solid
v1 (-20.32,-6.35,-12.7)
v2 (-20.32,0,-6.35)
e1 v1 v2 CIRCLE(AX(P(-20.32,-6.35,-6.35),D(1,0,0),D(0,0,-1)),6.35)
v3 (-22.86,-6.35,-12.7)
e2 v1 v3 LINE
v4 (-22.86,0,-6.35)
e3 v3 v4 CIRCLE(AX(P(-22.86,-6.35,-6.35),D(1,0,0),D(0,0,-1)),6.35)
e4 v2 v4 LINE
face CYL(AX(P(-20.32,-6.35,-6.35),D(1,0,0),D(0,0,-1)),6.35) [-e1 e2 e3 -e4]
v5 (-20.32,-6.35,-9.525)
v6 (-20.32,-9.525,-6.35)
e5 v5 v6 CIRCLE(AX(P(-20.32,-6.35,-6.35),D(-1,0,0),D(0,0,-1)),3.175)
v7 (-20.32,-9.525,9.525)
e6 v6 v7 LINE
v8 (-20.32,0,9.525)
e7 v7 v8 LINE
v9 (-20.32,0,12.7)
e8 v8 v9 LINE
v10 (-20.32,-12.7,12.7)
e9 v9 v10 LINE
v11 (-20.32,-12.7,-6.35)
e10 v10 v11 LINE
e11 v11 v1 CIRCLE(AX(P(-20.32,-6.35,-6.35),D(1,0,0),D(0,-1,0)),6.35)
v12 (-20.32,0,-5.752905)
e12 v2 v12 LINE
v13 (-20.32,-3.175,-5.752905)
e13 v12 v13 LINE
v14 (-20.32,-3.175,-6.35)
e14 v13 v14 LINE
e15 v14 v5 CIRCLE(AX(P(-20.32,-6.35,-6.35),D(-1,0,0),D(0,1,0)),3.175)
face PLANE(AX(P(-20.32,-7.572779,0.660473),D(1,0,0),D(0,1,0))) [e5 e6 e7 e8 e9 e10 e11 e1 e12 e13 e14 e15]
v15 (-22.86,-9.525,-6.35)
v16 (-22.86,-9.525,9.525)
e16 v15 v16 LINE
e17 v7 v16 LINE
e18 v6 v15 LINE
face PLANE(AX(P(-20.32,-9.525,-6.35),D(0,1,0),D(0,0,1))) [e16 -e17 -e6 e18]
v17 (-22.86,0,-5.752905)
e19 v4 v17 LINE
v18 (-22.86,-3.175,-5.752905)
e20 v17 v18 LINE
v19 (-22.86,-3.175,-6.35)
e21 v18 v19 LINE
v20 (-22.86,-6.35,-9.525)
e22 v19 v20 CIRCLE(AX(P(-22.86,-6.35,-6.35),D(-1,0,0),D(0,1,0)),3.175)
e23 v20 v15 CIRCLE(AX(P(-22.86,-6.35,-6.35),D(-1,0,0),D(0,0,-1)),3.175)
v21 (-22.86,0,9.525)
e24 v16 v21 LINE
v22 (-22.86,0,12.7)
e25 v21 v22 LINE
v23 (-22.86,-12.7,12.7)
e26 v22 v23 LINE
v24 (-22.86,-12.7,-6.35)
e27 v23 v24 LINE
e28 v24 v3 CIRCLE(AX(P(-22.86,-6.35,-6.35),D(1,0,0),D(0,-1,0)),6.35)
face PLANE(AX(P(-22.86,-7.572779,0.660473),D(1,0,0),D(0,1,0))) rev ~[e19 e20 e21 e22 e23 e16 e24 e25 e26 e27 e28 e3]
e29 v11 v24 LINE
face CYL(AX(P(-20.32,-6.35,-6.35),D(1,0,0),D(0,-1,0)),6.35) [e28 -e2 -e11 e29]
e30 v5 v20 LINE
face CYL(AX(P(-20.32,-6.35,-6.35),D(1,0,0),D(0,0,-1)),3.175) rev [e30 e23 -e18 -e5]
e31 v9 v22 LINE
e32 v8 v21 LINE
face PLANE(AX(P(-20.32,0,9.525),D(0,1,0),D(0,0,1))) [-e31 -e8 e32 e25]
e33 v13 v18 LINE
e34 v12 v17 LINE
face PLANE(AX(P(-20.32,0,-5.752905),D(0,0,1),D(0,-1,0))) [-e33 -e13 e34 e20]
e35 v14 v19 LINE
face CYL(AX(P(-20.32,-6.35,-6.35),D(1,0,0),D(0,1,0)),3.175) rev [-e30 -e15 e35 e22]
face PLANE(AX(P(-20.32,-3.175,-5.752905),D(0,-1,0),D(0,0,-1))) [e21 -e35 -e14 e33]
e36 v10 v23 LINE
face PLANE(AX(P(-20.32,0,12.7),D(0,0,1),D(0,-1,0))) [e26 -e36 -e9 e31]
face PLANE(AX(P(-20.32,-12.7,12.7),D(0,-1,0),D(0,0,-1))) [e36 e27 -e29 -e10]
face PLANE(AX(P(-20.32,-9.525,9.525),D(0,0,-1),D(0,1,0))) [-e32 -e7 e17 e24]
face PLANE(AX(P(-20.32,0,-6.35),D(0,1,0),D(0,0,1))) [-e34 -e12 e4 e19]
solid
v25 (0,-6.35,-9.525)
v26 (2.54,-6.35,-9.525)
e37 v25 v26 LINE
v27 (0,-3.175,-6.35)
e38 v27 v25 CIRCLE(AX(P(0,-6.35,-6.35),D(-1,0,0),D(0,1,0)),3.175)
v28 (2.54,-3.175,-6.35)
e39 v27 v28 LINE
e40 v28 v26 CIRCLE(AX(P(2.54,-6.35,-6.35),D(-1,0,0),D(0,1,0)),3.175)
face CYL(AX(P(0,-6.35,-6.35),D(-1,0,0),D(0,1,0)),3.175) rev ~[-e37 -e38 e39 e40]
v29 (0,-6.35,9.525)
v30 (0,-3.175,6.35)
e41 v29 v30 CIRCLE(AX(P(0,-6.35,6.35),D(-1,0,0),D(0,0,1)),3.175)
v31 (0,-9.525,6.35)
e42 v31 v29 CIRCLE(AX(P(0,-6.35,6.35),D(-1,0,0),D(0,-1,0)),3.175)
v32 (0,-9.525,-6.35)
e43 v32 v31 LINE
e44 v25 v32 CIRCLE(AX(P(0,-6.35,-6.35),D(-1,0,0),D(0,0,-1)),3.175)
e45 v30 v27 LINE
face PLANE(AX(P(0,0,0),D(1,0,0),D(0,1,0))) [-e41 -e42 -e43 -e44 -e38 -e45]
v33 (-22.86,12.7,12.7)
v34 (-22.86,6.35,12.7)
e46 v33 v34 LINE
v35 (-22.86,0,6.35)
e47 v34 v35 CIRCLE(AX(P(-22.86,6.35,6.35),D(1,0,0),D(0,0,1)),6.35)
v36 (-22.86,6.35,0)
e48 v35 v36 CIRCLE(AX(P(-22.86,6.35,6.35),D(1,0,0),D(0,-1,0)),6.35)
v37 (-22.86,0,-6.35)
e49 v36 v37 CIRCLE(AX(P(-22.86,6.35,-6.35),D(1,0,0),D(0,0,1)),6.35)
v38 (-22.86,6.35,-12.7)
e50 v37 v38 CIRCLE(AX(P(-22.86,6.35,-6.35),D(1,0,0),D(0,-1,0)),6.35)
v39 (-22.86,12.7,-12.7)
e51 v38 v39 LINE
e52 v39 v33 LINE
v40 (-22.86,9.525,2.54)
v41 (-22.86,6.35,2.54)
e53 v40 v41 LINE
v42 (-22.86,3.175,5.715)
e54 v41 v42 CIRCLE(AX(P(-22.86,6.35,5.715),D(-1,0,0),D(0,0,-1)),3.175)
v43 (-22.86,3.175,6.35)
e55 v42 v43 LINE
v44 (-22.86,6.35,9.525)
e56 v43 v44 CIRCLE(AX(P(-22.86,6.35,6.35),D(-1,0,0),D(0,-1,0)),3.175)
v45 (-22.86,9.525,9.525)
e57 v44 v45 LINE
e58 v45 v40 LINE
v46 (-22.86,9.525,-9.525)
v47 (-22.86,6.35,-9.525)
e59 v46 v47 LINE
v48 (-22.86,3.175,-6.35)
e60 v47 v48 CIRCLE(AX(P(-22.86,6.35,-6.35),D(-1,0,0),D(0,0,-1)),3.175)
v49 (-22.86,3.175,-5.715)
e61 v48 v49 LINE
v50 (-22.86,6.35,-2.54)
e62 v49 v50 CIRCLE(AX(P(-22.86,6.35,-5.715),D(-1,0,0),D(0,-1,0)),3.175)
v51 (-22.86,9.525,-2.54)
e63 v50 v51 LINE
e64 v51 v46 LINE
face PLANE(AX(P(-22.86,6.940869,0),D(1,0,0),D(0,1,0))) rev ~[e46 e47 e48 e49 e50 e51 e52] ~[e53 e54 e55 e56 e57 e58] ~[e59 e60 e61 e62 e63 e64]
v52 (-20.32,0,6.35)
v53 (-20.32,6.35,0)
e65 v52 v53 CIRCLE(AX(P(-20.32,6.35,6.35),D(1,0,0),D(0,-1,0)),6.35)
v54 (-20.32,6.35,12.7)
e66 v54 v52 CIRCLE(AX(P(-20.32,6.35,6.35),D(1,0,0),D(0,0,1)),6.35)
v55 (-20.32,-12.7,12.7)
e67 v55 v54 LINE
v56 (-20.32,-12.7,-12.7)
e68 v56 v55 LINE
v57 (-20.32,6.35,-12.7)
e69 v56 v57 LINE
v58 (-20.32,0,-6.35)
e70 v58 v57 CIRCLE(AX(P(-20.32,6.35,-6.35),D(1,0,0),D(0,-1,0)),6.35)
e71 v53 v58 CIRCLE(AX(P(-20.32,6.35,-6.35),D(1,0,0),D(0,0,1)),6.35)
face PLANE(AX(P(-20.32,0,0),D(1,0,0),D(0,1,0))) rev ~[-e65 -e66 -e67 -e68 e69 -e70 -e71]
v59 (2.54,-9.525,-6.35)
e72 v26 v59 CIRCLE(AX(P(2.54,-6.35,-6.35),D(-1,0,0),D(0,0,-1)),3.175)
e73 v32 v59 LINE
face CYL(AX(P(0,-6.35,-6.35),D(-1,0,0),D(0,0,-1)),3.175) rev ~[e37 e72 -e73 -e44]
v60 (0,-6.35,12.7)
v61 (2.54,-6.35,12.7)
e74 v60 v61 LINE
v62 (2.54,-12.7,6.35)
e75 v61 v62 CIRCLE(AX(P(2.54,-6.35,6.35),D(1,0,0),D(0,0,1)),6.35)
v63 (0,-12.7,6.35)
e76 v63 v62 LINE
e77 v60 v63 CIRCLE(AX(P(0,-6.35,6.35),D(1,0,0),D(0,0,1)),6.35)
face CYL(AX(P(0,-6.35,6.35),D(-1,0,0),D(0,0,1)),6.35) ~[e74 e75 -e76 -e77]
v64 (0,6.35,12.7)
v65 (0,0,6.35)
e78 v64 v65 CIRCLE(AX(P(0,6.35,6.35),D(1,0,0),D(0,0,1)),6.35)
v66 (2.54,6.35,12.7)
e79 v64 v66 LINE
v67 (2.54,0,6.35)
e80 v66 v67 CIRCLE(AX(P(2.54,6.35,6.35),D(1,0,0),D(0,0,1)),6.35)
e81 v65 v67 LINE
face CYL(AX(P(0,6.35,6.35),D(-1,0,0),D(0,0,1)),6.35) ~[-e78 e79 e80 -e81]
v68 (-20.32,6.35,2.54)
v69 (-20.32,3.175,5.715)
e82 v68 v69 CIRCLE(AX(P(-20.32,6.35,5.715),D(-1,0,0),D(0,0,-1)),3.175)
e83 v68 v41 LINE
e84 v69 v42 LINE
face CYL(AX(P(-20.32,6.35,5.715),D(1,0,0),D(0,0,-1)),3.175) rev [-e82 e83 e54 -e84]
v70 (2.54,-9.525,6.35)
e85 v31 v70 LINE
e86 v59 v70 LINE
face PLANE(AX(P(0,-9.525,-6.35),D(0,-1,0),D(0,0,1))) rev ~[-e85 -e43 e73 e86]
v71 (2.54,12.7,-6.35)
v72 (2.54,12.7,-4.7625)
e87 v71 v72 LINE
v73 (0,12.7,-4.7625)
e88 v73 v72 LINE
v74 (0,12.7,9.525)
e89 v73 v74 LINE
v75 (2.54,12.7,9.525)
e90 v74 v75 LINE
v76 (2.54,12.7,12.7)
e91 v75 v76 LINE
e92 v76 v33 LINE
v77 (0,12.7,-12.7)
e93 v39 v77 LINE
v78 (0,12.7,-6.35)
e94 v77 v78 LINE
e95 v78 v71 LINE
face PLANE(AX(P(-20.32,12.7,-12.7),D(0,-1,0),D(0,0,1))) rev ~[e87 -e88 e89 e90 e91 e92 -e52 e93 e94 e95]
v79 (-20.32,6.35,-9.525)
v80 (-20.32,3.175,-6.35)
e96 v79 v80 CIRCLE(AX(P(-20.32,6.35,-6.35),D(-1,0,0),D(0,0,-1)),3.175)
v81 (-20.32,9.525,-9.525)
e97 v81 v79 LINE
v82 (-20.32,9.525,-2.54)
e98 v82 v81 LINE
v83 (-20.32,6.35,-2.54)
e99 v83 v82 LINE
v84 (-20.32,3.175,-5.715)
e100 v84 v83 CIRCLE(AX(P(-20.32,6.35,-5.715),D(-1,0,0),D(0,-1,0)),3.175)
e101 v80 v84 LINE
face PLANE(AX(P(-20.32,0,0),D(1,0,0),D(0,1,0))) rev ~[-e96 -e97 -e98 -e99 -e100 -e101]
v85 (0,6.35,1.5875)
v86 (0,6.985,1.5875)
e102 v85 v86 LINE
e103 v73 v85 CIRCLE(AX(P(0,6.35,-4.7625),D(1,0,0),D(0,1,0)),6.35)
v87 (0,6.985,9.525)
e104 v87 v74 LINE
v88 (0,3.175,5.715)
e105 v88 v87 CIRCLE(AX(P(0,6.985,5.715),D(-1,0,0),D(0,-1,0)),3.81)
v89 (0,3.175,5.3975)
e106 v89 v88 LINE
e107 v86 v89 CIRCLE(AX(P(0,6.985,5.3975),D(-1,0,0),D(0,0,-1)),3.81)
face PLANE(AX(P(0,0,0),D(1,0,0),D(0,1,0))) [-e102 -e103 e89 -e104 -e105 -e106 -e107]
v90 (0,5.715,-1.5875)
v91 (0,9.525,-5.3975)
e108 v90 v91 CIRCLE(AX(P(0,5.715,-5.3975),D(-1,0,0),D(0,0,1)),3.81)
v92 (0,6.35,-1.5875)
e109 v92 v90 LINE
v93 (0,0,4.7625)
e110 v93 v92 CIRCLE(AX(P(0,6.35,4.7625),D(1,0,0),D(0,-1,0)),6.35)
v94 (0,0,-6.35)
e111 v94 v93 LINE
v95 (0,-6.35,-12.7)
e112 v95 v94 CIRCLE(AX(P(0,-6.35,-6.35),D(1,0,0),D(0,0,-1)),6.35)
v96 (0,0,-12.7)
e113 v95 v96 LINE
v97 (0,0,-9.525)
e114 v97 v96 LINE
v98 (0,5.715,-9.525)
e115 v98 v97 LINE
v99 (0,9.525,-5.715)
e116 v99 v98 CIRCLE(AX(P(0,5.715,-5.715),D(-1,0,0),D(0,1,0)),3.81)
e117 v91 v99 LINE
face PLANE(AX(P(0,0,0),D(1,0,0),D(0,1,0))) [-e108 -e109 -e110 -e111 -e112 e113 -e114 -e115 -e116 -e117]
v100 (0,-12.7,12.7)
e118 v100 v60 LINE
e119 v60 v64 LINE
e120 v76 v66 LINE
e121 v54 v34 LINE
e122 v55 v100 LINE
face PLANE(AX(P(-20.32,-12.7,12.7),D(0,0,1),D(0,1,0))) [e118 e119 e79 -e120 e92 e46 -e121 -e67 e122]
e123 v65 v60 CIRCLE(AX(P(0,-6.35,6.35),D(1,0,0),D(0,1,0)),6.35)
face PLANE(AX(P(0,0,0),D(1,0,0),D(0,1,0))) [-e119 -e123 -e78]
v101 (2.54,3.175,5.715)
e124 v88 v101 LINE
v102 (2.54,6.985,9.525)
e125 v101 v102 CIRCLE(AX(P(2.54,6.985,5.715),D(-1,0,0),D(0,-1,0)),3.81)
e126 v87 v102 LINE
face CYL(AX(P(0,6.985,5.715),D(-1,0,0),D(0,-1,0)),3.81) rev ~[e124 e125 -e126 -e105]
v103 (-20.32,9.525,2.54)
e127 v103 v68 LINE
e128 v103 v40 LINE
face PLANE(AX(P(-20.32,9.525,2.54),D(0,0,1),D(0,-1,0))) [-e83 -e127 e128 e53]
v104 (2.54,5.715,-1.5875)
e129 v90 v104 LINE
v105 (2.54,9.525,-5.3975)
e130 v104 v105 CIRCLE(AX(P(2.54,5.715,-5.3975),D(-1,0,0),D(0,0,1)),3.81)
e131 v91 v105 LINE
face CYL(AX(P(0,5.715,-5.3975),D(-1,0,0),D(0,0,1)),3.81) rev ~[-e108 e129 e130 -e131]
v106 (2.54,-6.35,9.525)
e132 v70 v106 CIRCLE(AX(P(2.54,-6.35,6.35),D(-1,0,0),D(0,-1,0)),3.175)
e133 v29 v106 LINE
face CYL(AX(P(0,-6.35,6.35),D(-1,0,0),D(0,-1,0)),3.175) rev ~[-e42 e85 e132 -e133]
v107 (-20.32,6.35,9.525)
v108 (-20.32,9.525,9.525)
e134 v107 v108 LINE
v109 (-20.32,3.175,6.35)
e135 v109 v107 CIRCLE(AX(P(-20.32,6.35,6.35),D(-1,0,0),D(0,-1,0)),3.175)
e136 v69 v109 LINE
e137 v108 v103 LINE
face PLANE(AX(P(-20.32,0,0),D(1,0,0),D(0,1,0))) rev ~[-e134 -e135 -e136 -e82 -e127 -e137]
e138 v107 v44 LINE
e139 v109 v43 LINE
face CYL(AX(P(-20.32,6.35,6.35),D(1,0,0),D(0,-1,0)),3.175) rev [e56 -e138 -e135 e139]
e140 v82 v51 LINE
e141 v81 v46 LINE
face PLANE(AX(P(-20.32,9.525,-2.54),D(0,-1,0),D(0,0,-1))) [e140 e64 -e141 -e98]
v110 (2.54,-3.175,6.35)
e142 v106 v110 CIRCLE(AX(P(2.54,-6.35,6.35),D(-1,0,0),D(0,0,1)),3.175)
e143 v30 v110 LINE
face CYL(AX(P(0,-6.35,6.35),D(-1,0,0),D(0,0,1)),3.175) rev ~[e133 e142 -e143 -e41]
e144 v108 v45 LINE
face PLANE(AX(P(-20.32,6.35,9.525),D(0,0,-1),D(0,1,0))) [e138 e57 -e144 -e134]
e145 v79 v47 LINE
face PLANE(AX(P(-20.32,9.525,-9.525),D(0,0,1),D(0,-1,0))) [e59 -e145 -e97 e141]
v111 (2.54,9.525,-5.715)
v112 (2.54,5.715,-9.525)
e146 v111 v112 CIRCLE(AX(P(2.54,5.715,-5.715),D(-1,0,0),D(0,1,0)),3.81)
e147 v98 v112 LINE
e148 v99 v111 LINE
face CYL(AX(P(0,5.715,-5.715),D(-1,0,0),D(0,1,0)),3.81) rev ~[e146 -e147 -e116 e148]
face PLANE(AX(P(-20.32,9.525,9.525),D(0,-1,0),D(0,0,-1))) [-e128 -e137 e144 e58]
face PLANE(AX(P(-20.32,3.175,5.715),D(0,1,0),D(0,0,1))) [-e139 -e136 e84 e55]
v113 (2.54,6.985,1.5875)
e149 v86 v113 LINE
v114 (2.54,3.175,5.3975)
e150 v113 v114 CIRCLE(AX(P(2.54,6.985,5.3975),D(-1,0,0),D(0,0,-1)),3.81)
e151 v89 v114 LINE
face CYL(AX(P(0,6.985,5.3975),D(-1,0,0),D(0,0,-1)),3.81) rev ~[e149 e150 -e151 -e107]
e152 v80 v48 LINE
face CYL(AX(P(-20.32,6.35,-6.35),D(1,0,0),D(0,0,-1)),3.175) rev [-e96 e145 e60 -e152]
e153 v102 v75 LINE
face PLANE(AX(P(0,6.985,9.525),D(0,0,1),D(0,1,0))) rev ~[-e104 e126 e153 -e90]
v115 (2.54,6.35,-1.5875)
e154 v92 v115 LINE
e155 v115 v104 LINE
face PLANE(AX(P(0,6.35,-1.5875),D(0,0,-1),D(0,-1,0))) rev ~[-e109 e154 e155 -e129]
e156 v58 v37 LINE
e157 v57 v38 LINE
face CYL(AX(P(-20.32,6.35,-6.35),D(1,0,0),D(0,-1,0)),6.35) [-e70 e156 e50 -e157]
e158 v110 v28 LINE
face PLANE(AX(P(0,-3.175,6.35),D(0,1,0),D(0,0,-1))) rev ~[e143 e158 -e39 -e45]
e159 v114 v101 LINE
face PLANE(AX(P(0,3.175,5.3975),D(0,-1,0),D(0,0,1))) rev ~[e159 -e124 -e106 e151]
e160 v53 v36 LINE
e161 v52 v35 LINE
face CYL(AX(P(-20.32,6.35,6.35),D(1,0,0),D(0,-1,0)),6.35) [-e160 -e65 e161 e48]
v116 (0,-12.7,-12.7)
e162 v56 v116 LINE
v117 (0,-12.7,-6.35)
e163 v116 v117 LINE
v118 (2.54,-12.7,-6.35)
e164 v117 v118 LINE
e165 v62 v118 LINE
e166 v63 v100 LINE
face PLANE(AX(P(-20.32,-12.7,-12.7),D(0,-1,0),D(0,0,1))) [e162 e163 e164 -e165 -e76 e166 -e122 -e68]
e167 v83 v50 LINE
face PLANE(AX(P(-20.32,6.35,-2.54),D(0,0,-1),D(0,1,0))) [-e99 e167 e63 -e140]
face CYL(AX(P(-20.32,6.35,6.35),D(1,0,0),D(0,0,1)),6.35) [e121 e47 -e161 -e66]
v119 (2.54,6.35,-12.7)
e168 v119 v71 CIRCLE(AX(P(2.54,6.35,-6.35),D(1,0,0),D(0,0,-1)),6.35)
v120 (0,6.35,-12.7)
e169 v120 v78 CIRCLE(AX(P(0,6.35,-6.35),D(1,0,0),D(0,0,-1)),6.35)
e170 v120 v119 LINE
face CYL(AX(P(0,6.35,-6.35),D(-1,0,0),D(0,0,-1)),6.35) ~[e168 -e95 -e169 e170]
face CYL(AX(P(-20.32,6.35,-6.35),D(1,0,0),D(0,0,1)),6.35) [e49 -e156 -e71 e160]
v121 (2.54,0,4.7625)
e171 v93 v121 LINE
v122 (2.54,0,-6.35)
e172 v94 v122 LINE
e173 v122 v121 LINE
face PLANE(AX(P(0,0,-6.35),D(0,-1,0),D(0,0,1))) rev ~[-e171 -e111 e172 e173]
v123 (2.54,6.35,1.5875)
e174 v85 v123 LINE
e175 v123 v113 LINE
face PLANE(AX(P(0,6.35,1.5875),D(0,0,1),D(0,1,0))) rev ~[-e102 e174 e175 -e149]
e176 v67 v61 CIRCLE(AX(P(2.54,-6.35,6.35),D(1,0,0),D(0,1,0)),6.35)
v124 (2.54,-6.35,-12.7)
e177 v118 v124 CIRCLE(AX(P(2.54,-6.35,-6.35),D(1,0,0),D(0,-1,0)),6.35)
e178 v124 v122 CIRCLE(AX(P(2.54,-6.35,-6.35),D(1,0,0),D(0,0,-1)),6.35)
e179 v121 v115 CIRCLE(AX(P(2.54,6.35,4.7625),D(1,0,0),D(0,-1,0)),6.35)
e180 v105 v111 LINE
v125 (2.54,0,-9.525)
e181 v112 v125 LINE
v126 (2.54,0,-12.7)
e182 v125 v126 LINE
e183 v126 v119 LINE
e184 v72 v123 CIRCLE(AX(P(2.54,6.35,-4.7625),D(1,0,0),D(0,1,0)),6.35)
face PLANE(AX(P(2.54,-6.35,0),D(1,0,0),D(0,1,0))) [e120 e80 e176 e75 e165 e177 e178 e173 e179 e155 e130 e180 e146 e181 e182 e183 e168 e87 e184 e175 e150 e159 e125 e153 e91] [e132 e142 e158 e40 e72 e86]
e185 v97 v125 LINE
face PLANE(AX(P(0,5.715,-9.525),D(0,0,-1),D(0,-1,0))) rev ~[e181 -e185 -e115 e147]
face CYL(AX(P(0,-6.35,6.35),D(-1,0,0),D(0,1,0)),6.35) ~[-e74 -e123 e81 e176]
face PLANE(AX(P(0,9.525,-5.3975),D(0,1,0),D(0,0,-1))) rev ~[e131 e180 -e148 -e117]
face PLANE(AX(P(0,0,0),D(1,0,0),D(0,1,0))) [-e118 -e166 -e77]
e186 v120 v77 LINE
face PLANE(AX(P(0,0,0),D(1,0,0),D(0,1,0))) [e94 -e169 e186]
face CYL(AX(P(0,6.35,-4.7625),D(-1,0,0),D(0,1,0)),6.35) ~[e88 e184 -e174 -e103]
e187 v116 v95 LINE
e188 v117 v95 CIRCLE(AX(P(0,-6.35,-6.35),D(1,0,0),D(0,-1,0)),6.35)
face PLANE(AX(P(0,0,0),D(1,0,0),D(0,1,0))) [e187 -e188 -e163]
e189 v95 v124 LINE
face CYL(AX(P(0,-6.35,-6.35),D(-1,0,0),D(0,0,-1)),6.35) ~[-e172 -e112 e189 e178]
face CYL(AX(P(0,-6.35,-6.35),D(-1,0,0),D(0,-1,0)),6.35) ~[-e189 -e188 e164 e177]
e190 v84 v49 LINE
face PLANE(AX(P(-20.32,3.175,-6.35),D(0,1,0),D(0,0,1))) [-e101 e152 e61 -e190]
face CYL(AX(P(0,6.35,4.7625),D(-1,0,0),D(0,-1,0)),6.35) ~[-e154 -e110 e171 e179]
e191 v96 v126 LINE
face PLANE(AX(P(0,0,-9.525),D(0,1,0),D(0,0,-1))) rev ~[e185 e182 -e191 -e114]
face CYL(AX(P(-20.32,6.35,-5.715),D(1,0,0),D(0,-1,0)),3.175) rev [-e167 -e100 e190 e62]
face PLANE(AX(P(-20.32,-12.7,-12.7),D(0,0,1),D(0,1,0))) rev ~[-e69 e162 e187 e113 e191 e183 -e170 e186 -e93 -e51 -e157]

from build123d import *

# Parameters (mm, degrees)
F3_DEPTH = 2.54
F4_DEPTH = 2.54
F5_W     = 25.4
F5_H     = 25.4
F6_DEPTH = 20.32


with BuildPart() as f3:
    # F0 (on Right) → F3 (new body)
    with BuildSketch(Plane.YZ):
        with BuildLine():
            Line((0, 4.7625), (0, 6.35))
            ThreePointArc((0, 6.35), (-1.8598719395, 10.8401280605), (-6.35, 12.7))
            ThreePointArc((-6.35, 12.7), (-10.8401280605, 10.8401280605), (-12.7, 6.35))
            Line((-12.7, 6.35), (-12.7, -6.35))
            ThreePointArc((-12.7, -6.35), (-10.8401280605, -10.8401280605), (-6.35, -12.7))
            ThreePointArc((-6.35, -12.7), (-1.8598719395, -10.8401280605), (0, -6.35))
            Line((0, -6.35), (0, -3.81))
            Line((0, -3.81), (0, 4.7625))
        make_face()
        with BuildLine():
            ThreePointArc((-6.35, 9.525), (-4.1049359697, 8.5950640303), (-3.175, 6.35))
            Line((-3.175, 6.35), (-3.175, -6.35))
            ThreePointArc((-3.175, -6.35), (-4.1049359697, -8.5950640303), (-6.35, -9.525))
            ThreePointArc((-6.35, -9.525), (-8.5950640303, -8.5950640303), (-9.525, -6.35))
            Line((-9.525, -6.35), (-9.525, 6.35))
            ThreePointArc((-9.525, 6.35), (-8.5950640303, 8.5950640303), (-6.35, 9.525))
        make_face(mode=Mode.SUBTRACT)
        with BuildLine():
            Line((12.7, 12.7), (11.43, 12.7))
            Line((11.43, 12.7), (6.35, 12.7))
            ThreePointArc((6.35, 12.7), (1.8598719395, 10.8401280605), (0, 6.35))
            Line((0, 6.35), (0, 4.7625))
            ThreePointArc((0, 4.7625), (1.8598719395, 0.2723719395), (6.35, -1.5875))
            Line((6.35, -1.5875), (5.715, -1.5875))
            ThreePointArc((5.715, -1.5875), (8.4090768363, -2.7034231637), (9.525, -5.3975))
            Line((9.525, -5.3975), (9.525, -5.715))
            ThreePointArc((9.525, -5.715), (8.4090768363, -8.4090768363), (5.715, -9.525))
            Line((5.715, -9.525), (1.27, -9.525))
            Line((1.27, -9.525), (0, -9.525))
            Line((0, -9.525), (0, -12.7))
            Line((0, -12.7), (1.27, -12.7))
            Line((1.27, -12.7), (6.35, -12.7))
            ThreePointArc((6.35, -12.7), (10.8401280605, -10.8401280605), (12.7, -6.35))
            Line((12.7, -6.35), (12.7, -4.7625))
            ThreePointArc((12.7, -4.7625), (10.8401280605, -0.2723719395), (6.35, 1.5875))
            Line((6.35, 1.5875), (6.985, 1.5875))
            ThreePointArc((6.985, 1.5875), (4.2909231637, 2.7034231637), (3.175, 5.3975))
            Line((3.175, 5.3975), (3.175, 5.715))
            ThreePointArc((3.175, 5.715), (4.2909231637, 8.4090768363), (6.985, 9.525))
            Line((6.985, 9.525), (11.43, 9.525))
            Line((11.43, 9.525), (12.7, 9.525))
            Line((12.7, 9.525), (12.7, 12.7))
        make_face()
    extrude(amount=F3_DEPTH)



with BuildPart() as f4:
    # F2 (on offset) → F4 (new body)
    with BuildSketch(Plane.YZ.offset(-20.32)):
        with BuildLine():
            Line((12.7, -12.7), (12.7, 12.7))
            Line((12.7, 12.7), (6.35, 12.7))
            ThreePointArc((6.35, 12.7), (1.8598719395, 10.8401280605), (0, 6.35))
            ThreePointArc((0, 6.35), (1.8598719395, 1.8598719395), (6.35, 0))
            ThreePointArc((6.35, 0), (1.8598719395, -1.8598719395), (0, -6.35))
            ThreePointArc((0, -6.35), (1.8598719395, -10.8401280605), (6.35, -12.7))
            Line((6.35, -12.7), (12.7, -12.7))
        make_face()
        with BuildLine():
            Line((9.525, -2.54), (9.525, -9.525))
            Line((9.525, -9.525), (6.35, -9.525))
            ThreePointArc((6.35, -9.525), (4.1049359697, -8.5950640303), (3.175, -6.35))
            Line((3.175, -6.35), (3.175, -5.715))
            ThreePointArc((3.175, -5.715), (4.1049359697, -3.4699359697), (6.35, -2.54))
            Line((6.35, -2.54), (9.525, -2.54))
        make_face(mode=Mode.SUBTRACT)
        with BuildLine():
            Line((6.35, 9.525), (9.525, 9.525))
            Line((9.525, 9.525), (9.525, 2.54))
            Line((9.525, 2.54), (6.35, 2.54))
            ThreePointArc((6.35, 2.54), (4.1049359697, 3.4699359697), (3.175, 5.715))
            Line((3.175, 5.715), (3.175, 6.35))
            ThreePointArc((3.175, 6.35), (4.1049359697, 8.5950640303), (6.35, 9.525))
        make_face(mode=Mode.SUBTRACT)
    extrude(amount=-F4_DEPTH)


with BuildPart() as f4b:
    # F2 (on offset) → F4, piece 2 (new body)
    with BuildSketch(Plane.YZ.offset(-20.32)):
        with BuildLine():
            ThreePointArc((-6.35, -12.7), (-1.8598719395, -10.8401280605), (0, -6.35))
            Line((0, -6.35), (0, -5.7529052719))
            Line((0, -5.7529052719), (-3.175, -5.7529052719))
            Line((-3.175, -5.7529052719), (-3.175, -6.35))
            ThreePointArc((-3.175, -6.35), (-4.1049359697, -8.5950640303), (-6.35, -9.525))
            ThreePointArc((-6.35, -9.525), (-8.5950640303, -8.5950640303), (-9.525, -6.35))
            Line((-9.525, -6.35), (-9.525, 9.525))
            Line((-9.525, 9.525), (0, 9.525))
            Line((0, 9.525), (0, 12.7))
            Line((0, 12.7), (-12.7, 12.7))
            Line((-12.7, 12.7), (-12.7, -6.35))
            ThreePointArc((-12.7, -6.35), (-10.8401280605, -10.8401280605), (-6.35, -12.7))
        make_face()
    extrude(amount=-F4_DEPTH)


with BuildPart() as f3_1:
    add(f3.part)

    add(f4.part)  # F6 merges F4
    # F5 (on face) → F6 (join)
    with BuildSketch(Plane.YZ.offset(-20.32)):
        Rectangle(F5_W, F5_H)
    extrude(amount=F6_DEPTH)


solid = Compound([f4b.part, f3_1.part])
